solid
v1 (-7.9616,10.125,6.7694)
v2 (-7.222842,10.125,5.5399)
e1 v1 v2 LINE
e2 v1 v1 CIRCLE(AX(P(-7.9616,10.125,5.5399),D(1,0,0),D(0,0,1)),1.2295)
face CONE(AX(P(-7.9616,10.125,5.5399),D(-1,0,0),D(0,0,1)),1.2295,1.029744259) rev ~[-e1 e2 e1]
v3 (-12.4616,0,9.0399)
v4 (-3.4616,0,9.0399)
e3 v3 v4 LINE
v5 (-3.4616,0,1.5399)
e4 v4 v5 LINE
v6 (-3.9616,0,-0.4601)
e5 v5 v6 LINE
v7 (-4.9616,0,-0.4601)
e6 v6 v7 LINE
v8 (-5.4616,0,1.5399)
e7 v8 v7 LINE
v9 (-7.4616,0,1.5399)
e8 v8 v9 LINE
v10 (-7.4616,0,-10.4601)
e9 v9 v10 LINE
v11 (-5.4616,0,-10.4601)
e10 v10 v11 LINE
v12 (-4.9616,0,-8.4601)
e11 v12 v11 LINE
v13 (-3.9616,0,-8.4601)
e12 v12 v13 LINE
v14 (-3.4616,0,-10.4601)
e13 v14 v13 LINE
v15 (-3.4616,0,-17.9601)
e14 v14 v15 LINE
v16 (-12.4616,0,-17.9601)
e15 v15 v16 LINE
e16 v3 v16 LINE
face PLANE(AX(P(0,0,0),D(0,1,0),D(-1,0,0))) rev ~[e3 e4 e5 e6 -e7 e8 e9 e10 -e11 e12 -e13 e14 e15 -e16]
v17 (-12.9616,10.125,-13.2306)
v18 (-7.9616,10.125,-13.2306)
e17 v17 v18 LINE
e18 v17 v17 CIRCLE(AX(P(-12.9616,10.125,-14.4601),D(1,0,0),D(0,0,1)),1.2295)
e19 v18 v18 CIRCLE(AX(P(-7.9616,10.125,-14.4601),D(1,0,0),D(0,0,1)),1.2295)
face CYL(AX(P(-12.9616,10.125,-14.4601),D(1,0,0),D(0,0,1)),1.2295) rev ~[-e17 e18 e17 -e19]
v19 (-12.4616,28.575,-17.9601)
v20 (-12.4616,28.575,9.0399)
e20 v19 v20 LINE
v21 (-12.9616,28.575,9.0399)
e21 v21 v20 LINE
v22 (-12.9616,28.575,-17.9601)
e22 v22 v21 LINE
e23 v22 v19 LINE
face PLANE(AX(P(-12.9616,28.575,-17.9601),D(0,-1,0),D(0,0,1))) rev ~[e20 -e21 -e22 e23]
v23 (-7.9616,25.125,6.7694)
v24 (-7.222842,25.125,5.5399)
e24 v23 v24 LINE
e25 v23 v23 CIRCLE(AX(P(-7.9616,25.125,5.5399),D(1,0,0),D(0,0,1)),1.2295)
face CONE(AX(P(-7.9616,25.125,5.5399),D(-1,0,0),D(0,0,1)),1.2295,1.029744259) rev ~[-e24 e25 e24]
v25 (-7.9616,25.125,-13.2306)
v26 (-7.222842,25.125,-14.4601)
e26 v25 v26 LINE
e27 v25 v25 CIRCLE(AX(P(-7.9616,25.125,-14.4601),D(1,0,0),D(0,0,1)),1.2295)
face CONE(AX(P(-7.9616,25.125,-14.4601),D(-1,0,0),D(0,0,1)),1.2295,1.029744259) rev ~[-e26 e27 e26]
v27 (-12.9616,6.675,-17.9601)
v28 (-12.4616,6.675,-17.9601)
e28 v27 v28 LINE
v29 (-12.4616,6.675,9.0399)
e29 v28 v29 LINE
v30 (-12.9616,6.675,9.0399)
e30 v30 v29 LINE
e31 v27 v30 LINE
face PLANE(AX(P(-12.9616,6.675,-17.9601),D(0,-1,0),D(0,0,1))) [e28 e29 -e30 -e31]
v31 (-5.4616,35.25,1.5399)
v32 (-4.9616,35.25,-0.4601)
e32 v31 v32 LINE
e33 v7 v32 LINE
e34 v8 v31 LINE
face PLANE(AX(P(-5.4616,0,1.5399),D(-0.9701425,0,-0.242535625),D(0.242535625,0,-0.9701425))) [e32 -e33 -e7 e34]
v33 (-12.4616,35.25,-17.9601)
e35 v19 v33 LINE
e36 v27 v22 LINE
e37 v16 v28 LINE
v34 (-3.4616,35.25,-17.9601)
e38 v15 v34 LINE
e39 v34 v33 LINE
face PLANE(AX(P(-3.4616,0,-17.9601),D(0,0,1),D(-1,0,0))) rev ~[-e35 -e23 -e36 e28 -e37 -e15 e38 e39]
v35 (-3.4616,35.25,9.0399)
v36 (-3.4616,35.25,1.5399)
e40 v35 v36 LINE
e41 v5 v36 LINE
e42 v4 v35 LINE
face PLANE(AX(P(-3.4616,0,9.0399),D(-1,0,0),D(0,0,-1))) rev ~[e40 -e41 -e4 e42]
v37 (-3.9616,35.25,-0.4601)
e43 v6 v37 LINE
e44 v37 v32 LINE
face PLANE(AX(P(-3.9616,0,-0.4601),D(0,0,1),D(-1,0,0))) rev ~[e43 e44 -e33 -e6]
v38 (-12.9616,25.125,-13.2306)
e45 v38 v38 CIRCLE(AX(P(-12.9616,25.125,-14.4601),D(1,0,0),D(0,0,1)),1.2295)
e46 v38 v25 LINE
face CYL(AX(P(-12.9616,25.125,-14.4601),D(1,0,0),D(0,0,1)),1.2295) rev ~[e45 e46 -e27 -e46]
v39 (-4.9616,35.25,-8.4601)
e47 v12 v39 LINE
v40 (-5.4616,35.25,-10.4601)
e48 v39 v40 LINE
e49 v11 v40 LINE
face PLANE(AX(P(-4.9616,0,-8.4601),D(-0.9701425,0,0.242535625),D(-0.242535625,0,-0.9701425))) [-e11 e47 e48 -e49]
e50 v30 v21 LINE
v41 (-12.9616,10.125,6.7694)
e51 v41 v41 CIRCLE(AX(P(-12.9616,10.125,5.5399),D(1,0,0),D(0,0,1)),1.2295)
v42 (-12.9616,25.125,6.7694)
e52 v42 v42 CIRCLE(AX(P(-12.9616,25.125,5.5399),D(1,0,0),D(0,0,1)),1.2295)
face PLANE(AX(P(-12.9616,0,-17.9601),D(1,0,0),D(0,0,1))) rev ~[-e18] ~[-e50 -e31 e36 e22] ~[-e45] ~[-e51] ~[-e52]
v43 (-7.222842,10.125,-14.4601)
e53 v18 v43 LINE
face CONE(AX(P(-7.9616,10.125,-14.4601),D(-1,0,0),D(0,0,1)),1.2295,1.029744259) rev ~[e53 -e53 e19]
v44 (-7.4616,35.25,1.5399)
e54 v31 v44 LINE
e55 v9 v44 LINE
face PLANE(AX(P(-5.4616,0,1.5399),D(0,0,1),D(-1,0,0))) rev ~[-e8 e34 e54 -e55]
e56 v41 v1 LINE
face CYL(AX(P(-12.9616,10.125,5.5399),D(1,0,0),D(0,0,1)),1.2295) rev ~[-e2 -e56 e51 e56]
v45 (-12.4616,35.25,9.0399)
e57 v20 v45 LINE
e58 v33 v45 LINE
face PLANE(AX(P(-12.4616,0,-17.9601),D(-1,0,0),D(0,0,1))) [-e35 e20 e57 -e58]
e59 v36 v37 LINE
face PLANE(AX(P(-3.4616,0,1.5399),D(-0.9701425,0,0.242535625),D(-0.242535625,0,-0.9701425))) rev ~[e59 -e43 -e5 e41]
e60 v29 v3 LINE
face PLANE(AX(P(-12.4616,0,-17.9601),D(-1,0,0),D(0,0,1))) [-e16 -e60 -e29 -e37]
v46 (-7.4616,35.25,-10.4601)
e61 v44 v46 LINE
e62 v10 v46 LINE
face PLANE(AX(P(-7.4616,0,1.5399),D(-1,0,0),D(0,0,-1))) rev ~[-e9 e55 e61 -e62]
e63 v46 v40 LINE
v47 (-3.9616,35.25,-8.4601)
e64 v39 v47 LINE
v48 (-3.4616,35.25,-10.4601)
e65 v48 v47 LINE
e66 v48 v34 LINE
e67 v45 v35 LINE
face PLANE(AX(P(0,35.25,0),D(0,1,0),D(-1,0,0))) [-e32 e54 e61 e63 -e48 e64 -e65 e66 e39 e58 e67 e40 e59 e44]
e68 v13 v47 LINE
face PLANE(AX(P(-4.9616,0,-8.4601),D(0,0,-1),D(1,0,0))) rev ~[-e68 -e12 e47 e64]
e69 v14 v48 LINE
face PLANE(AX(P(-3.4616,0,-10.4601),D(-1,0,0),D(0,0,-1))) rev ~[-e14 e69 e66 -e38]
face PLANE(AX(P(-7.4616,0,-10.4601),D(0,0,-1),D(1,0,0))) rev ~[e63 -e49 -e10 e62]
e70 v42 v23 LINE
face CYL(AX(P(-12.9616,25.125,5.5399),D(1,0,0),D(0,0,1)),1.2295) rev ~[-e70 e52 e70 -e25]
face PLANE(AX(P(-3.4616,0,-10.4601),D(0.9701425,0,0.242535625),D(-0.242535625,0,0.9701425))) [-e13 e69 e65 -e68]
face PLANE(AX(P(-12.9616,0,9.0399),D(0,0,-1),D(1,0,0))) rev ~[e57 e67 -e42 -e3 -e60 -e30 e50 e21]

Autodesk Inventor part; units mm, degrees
ref_plane "YZ Plane" through (0, 0, 0) normal (1, 0, 0) x (0, 1, 0)
ref_plane "XZ Plane" through (0, 0, 0) normal (0, 1, 0) x (-1, 0, 0)
ref_plane "XY Plane" through (0, 0, 0) normal (0, 0, 1) x (1, 0, 0)
sketch "Sketch1" plane through (0, 0, 0) normal (0, 1, 0) x (-1, 0, 0)
  line L0 (3.9616, -0.4601) -> (4.9616, -0.4601)
  line L1 (5.4616, 1.5399) -> (7.4616, 1.5399)
  line L2 (7.4616, 1.5399) -> (7.4616, -10.4601)
  line L3 (7.4616, -10.4601) -> (5.4616, -10.4601)
  line L4 (4.9616, -8.4601) -> (3.9616, -8.4601)
  line L5 (5.4616, 1.5399) -> (4.9616, -0.4601)
  line L6 (3.4616, 1.5399) -> (3.9616, -0.4601)
  line L7 (4.9616, -8.4601) -> (5.4616, -10.4601)
  line L8 (3.4616, -10.4601) -> (3.9616, -8.4601)
  line L9 (3.4616, -10.4601) -> (3.4616, -17.9601)
  line L10 (3.4616, -17.9601) -> (12.9616, -17.9601)
  line L11 (12.9616, -17.9601) -> (12.9616, 9.0399)
  line L12 (12.9616, 9.0399) -> (3.4616, 9.0399)
  line L13 (3.4616, 9.0399) -> (3.4616, 1.5399)
  point P0 (0, 0)
  point P1 (12.9616, -4.4601)
  point P2 (7.4616, -4.4601)
  point P3 (6.4616, -10.4601)
  dimension "d2" = 8
  dimension "d3" = 1
  dimension "d5" = 0.5
  dimension "d6" = 4
  dimension "d8" = 9.5
  dimension "d9" = 27
  dimension "d12" = 0
  dimension "d13" = 12
  dimension "d14" = 2
  dimension "d15" = 2
extrude "Extrusion1" add sketch "Sketch1" along normal blind 35.25
sketch "Sketch2" plane through (-12.9616, 0, -17.9601) normal (-1, 0, 0) x (0, 0, 1)
  line L0 (0, 35.25) -> (27, 35.25) projected
  line L1 (0, 0) -> (0, 35.25) projected
  point P0 (17.9601, 0)
  point P1 (3.5, 25.125)
  point P2 (23.5, 25.125)
  point P3 (23.5, 10.125)
  point P4 (3.5, 10.125)
  dimension "d16" = 20
  dimension "d17" = 20
  dimension "d18" = 15
  dimension "d19" = 15
  dimension "d20" = 0
  dimension "d21" = 0
  dimension "d22" = 35.25
  dimension "d23" = 27
  dimension "d24" = 10.125
  dimension "d25" = 3.5
hole "Hole1" at (-12.9616, 25.125, -14.4601) at (-12.9616, 25.125, 5.5399) at (-12.9616, 10.125, 5.5399) at (-12.9616, 10.125, -14.4601) direction (1, 0, 0) diameter 2.459 depth 5 tip angle 118 thread size "M3x0.5" class "6H" standard "ISO Metric profile"
sketch "Sketch3" plane through (-12.9616, 0, -17.9601) normal (-1, 0, 0) x (0, 0, 1)
  line L0 (0, 35.25) -> (27, 35.25) projected
  line L1 (0, 0) -> (0, 35.25) projected
  line L2 (27, 35.25) -> (0, 35.25)
  line L3 (0, 35.25) -> (0, 28.575)
  line L4 (0, 28.575) -> (27, 28.575)
  line L5 (27, 28.575) -> (27, 35.25)
  line L6 (27, 0) -> (0, 0)
  line L7 (0, 0) -> (0, 6.675)
  line L8 (0, 6.675) -> (27, 6.675)
  line L9 (27, 6.675) -> (27, 0)
  point P0 (17.9601, 0)
  point P1 (0, 6.675)
  dimension "d33" = 35.25
  dimension "d34" = 21.9
  dimension "d35" = 6.675
extrude "Extrusion2" cut sketch "Sketch3" against normal blind 0.5
equation "\"d24\" = -0.5 * d18 + 0.5 * d22"
equation "\"d25\" = -0.5 * d16 + 0.5 * d23"
equation "\"d35\" = -0.5 * d34 + 0.5 * d33"
equation "\"GapSize\" = Thickness"
equation "\"BendRadius\" = Thickness"
equation "\"MinimumRemnant\" = 2 * Thickness"
equation "\"BendReliefDepth\" = 0.5 * Thickness"
equation "\"BendReliefWidth\" = Thickness"
equation "\"CornerReliefSize\" = 4 * Thickness"
equation "\"JacobiRadiusSize\" = BendRadius"
equation "\"TransitionRadius\" = BendRadius"
equation "\"Thickness\" = 0.5"
properties part number "Guia do trilho" material "Steel, Alloy"
